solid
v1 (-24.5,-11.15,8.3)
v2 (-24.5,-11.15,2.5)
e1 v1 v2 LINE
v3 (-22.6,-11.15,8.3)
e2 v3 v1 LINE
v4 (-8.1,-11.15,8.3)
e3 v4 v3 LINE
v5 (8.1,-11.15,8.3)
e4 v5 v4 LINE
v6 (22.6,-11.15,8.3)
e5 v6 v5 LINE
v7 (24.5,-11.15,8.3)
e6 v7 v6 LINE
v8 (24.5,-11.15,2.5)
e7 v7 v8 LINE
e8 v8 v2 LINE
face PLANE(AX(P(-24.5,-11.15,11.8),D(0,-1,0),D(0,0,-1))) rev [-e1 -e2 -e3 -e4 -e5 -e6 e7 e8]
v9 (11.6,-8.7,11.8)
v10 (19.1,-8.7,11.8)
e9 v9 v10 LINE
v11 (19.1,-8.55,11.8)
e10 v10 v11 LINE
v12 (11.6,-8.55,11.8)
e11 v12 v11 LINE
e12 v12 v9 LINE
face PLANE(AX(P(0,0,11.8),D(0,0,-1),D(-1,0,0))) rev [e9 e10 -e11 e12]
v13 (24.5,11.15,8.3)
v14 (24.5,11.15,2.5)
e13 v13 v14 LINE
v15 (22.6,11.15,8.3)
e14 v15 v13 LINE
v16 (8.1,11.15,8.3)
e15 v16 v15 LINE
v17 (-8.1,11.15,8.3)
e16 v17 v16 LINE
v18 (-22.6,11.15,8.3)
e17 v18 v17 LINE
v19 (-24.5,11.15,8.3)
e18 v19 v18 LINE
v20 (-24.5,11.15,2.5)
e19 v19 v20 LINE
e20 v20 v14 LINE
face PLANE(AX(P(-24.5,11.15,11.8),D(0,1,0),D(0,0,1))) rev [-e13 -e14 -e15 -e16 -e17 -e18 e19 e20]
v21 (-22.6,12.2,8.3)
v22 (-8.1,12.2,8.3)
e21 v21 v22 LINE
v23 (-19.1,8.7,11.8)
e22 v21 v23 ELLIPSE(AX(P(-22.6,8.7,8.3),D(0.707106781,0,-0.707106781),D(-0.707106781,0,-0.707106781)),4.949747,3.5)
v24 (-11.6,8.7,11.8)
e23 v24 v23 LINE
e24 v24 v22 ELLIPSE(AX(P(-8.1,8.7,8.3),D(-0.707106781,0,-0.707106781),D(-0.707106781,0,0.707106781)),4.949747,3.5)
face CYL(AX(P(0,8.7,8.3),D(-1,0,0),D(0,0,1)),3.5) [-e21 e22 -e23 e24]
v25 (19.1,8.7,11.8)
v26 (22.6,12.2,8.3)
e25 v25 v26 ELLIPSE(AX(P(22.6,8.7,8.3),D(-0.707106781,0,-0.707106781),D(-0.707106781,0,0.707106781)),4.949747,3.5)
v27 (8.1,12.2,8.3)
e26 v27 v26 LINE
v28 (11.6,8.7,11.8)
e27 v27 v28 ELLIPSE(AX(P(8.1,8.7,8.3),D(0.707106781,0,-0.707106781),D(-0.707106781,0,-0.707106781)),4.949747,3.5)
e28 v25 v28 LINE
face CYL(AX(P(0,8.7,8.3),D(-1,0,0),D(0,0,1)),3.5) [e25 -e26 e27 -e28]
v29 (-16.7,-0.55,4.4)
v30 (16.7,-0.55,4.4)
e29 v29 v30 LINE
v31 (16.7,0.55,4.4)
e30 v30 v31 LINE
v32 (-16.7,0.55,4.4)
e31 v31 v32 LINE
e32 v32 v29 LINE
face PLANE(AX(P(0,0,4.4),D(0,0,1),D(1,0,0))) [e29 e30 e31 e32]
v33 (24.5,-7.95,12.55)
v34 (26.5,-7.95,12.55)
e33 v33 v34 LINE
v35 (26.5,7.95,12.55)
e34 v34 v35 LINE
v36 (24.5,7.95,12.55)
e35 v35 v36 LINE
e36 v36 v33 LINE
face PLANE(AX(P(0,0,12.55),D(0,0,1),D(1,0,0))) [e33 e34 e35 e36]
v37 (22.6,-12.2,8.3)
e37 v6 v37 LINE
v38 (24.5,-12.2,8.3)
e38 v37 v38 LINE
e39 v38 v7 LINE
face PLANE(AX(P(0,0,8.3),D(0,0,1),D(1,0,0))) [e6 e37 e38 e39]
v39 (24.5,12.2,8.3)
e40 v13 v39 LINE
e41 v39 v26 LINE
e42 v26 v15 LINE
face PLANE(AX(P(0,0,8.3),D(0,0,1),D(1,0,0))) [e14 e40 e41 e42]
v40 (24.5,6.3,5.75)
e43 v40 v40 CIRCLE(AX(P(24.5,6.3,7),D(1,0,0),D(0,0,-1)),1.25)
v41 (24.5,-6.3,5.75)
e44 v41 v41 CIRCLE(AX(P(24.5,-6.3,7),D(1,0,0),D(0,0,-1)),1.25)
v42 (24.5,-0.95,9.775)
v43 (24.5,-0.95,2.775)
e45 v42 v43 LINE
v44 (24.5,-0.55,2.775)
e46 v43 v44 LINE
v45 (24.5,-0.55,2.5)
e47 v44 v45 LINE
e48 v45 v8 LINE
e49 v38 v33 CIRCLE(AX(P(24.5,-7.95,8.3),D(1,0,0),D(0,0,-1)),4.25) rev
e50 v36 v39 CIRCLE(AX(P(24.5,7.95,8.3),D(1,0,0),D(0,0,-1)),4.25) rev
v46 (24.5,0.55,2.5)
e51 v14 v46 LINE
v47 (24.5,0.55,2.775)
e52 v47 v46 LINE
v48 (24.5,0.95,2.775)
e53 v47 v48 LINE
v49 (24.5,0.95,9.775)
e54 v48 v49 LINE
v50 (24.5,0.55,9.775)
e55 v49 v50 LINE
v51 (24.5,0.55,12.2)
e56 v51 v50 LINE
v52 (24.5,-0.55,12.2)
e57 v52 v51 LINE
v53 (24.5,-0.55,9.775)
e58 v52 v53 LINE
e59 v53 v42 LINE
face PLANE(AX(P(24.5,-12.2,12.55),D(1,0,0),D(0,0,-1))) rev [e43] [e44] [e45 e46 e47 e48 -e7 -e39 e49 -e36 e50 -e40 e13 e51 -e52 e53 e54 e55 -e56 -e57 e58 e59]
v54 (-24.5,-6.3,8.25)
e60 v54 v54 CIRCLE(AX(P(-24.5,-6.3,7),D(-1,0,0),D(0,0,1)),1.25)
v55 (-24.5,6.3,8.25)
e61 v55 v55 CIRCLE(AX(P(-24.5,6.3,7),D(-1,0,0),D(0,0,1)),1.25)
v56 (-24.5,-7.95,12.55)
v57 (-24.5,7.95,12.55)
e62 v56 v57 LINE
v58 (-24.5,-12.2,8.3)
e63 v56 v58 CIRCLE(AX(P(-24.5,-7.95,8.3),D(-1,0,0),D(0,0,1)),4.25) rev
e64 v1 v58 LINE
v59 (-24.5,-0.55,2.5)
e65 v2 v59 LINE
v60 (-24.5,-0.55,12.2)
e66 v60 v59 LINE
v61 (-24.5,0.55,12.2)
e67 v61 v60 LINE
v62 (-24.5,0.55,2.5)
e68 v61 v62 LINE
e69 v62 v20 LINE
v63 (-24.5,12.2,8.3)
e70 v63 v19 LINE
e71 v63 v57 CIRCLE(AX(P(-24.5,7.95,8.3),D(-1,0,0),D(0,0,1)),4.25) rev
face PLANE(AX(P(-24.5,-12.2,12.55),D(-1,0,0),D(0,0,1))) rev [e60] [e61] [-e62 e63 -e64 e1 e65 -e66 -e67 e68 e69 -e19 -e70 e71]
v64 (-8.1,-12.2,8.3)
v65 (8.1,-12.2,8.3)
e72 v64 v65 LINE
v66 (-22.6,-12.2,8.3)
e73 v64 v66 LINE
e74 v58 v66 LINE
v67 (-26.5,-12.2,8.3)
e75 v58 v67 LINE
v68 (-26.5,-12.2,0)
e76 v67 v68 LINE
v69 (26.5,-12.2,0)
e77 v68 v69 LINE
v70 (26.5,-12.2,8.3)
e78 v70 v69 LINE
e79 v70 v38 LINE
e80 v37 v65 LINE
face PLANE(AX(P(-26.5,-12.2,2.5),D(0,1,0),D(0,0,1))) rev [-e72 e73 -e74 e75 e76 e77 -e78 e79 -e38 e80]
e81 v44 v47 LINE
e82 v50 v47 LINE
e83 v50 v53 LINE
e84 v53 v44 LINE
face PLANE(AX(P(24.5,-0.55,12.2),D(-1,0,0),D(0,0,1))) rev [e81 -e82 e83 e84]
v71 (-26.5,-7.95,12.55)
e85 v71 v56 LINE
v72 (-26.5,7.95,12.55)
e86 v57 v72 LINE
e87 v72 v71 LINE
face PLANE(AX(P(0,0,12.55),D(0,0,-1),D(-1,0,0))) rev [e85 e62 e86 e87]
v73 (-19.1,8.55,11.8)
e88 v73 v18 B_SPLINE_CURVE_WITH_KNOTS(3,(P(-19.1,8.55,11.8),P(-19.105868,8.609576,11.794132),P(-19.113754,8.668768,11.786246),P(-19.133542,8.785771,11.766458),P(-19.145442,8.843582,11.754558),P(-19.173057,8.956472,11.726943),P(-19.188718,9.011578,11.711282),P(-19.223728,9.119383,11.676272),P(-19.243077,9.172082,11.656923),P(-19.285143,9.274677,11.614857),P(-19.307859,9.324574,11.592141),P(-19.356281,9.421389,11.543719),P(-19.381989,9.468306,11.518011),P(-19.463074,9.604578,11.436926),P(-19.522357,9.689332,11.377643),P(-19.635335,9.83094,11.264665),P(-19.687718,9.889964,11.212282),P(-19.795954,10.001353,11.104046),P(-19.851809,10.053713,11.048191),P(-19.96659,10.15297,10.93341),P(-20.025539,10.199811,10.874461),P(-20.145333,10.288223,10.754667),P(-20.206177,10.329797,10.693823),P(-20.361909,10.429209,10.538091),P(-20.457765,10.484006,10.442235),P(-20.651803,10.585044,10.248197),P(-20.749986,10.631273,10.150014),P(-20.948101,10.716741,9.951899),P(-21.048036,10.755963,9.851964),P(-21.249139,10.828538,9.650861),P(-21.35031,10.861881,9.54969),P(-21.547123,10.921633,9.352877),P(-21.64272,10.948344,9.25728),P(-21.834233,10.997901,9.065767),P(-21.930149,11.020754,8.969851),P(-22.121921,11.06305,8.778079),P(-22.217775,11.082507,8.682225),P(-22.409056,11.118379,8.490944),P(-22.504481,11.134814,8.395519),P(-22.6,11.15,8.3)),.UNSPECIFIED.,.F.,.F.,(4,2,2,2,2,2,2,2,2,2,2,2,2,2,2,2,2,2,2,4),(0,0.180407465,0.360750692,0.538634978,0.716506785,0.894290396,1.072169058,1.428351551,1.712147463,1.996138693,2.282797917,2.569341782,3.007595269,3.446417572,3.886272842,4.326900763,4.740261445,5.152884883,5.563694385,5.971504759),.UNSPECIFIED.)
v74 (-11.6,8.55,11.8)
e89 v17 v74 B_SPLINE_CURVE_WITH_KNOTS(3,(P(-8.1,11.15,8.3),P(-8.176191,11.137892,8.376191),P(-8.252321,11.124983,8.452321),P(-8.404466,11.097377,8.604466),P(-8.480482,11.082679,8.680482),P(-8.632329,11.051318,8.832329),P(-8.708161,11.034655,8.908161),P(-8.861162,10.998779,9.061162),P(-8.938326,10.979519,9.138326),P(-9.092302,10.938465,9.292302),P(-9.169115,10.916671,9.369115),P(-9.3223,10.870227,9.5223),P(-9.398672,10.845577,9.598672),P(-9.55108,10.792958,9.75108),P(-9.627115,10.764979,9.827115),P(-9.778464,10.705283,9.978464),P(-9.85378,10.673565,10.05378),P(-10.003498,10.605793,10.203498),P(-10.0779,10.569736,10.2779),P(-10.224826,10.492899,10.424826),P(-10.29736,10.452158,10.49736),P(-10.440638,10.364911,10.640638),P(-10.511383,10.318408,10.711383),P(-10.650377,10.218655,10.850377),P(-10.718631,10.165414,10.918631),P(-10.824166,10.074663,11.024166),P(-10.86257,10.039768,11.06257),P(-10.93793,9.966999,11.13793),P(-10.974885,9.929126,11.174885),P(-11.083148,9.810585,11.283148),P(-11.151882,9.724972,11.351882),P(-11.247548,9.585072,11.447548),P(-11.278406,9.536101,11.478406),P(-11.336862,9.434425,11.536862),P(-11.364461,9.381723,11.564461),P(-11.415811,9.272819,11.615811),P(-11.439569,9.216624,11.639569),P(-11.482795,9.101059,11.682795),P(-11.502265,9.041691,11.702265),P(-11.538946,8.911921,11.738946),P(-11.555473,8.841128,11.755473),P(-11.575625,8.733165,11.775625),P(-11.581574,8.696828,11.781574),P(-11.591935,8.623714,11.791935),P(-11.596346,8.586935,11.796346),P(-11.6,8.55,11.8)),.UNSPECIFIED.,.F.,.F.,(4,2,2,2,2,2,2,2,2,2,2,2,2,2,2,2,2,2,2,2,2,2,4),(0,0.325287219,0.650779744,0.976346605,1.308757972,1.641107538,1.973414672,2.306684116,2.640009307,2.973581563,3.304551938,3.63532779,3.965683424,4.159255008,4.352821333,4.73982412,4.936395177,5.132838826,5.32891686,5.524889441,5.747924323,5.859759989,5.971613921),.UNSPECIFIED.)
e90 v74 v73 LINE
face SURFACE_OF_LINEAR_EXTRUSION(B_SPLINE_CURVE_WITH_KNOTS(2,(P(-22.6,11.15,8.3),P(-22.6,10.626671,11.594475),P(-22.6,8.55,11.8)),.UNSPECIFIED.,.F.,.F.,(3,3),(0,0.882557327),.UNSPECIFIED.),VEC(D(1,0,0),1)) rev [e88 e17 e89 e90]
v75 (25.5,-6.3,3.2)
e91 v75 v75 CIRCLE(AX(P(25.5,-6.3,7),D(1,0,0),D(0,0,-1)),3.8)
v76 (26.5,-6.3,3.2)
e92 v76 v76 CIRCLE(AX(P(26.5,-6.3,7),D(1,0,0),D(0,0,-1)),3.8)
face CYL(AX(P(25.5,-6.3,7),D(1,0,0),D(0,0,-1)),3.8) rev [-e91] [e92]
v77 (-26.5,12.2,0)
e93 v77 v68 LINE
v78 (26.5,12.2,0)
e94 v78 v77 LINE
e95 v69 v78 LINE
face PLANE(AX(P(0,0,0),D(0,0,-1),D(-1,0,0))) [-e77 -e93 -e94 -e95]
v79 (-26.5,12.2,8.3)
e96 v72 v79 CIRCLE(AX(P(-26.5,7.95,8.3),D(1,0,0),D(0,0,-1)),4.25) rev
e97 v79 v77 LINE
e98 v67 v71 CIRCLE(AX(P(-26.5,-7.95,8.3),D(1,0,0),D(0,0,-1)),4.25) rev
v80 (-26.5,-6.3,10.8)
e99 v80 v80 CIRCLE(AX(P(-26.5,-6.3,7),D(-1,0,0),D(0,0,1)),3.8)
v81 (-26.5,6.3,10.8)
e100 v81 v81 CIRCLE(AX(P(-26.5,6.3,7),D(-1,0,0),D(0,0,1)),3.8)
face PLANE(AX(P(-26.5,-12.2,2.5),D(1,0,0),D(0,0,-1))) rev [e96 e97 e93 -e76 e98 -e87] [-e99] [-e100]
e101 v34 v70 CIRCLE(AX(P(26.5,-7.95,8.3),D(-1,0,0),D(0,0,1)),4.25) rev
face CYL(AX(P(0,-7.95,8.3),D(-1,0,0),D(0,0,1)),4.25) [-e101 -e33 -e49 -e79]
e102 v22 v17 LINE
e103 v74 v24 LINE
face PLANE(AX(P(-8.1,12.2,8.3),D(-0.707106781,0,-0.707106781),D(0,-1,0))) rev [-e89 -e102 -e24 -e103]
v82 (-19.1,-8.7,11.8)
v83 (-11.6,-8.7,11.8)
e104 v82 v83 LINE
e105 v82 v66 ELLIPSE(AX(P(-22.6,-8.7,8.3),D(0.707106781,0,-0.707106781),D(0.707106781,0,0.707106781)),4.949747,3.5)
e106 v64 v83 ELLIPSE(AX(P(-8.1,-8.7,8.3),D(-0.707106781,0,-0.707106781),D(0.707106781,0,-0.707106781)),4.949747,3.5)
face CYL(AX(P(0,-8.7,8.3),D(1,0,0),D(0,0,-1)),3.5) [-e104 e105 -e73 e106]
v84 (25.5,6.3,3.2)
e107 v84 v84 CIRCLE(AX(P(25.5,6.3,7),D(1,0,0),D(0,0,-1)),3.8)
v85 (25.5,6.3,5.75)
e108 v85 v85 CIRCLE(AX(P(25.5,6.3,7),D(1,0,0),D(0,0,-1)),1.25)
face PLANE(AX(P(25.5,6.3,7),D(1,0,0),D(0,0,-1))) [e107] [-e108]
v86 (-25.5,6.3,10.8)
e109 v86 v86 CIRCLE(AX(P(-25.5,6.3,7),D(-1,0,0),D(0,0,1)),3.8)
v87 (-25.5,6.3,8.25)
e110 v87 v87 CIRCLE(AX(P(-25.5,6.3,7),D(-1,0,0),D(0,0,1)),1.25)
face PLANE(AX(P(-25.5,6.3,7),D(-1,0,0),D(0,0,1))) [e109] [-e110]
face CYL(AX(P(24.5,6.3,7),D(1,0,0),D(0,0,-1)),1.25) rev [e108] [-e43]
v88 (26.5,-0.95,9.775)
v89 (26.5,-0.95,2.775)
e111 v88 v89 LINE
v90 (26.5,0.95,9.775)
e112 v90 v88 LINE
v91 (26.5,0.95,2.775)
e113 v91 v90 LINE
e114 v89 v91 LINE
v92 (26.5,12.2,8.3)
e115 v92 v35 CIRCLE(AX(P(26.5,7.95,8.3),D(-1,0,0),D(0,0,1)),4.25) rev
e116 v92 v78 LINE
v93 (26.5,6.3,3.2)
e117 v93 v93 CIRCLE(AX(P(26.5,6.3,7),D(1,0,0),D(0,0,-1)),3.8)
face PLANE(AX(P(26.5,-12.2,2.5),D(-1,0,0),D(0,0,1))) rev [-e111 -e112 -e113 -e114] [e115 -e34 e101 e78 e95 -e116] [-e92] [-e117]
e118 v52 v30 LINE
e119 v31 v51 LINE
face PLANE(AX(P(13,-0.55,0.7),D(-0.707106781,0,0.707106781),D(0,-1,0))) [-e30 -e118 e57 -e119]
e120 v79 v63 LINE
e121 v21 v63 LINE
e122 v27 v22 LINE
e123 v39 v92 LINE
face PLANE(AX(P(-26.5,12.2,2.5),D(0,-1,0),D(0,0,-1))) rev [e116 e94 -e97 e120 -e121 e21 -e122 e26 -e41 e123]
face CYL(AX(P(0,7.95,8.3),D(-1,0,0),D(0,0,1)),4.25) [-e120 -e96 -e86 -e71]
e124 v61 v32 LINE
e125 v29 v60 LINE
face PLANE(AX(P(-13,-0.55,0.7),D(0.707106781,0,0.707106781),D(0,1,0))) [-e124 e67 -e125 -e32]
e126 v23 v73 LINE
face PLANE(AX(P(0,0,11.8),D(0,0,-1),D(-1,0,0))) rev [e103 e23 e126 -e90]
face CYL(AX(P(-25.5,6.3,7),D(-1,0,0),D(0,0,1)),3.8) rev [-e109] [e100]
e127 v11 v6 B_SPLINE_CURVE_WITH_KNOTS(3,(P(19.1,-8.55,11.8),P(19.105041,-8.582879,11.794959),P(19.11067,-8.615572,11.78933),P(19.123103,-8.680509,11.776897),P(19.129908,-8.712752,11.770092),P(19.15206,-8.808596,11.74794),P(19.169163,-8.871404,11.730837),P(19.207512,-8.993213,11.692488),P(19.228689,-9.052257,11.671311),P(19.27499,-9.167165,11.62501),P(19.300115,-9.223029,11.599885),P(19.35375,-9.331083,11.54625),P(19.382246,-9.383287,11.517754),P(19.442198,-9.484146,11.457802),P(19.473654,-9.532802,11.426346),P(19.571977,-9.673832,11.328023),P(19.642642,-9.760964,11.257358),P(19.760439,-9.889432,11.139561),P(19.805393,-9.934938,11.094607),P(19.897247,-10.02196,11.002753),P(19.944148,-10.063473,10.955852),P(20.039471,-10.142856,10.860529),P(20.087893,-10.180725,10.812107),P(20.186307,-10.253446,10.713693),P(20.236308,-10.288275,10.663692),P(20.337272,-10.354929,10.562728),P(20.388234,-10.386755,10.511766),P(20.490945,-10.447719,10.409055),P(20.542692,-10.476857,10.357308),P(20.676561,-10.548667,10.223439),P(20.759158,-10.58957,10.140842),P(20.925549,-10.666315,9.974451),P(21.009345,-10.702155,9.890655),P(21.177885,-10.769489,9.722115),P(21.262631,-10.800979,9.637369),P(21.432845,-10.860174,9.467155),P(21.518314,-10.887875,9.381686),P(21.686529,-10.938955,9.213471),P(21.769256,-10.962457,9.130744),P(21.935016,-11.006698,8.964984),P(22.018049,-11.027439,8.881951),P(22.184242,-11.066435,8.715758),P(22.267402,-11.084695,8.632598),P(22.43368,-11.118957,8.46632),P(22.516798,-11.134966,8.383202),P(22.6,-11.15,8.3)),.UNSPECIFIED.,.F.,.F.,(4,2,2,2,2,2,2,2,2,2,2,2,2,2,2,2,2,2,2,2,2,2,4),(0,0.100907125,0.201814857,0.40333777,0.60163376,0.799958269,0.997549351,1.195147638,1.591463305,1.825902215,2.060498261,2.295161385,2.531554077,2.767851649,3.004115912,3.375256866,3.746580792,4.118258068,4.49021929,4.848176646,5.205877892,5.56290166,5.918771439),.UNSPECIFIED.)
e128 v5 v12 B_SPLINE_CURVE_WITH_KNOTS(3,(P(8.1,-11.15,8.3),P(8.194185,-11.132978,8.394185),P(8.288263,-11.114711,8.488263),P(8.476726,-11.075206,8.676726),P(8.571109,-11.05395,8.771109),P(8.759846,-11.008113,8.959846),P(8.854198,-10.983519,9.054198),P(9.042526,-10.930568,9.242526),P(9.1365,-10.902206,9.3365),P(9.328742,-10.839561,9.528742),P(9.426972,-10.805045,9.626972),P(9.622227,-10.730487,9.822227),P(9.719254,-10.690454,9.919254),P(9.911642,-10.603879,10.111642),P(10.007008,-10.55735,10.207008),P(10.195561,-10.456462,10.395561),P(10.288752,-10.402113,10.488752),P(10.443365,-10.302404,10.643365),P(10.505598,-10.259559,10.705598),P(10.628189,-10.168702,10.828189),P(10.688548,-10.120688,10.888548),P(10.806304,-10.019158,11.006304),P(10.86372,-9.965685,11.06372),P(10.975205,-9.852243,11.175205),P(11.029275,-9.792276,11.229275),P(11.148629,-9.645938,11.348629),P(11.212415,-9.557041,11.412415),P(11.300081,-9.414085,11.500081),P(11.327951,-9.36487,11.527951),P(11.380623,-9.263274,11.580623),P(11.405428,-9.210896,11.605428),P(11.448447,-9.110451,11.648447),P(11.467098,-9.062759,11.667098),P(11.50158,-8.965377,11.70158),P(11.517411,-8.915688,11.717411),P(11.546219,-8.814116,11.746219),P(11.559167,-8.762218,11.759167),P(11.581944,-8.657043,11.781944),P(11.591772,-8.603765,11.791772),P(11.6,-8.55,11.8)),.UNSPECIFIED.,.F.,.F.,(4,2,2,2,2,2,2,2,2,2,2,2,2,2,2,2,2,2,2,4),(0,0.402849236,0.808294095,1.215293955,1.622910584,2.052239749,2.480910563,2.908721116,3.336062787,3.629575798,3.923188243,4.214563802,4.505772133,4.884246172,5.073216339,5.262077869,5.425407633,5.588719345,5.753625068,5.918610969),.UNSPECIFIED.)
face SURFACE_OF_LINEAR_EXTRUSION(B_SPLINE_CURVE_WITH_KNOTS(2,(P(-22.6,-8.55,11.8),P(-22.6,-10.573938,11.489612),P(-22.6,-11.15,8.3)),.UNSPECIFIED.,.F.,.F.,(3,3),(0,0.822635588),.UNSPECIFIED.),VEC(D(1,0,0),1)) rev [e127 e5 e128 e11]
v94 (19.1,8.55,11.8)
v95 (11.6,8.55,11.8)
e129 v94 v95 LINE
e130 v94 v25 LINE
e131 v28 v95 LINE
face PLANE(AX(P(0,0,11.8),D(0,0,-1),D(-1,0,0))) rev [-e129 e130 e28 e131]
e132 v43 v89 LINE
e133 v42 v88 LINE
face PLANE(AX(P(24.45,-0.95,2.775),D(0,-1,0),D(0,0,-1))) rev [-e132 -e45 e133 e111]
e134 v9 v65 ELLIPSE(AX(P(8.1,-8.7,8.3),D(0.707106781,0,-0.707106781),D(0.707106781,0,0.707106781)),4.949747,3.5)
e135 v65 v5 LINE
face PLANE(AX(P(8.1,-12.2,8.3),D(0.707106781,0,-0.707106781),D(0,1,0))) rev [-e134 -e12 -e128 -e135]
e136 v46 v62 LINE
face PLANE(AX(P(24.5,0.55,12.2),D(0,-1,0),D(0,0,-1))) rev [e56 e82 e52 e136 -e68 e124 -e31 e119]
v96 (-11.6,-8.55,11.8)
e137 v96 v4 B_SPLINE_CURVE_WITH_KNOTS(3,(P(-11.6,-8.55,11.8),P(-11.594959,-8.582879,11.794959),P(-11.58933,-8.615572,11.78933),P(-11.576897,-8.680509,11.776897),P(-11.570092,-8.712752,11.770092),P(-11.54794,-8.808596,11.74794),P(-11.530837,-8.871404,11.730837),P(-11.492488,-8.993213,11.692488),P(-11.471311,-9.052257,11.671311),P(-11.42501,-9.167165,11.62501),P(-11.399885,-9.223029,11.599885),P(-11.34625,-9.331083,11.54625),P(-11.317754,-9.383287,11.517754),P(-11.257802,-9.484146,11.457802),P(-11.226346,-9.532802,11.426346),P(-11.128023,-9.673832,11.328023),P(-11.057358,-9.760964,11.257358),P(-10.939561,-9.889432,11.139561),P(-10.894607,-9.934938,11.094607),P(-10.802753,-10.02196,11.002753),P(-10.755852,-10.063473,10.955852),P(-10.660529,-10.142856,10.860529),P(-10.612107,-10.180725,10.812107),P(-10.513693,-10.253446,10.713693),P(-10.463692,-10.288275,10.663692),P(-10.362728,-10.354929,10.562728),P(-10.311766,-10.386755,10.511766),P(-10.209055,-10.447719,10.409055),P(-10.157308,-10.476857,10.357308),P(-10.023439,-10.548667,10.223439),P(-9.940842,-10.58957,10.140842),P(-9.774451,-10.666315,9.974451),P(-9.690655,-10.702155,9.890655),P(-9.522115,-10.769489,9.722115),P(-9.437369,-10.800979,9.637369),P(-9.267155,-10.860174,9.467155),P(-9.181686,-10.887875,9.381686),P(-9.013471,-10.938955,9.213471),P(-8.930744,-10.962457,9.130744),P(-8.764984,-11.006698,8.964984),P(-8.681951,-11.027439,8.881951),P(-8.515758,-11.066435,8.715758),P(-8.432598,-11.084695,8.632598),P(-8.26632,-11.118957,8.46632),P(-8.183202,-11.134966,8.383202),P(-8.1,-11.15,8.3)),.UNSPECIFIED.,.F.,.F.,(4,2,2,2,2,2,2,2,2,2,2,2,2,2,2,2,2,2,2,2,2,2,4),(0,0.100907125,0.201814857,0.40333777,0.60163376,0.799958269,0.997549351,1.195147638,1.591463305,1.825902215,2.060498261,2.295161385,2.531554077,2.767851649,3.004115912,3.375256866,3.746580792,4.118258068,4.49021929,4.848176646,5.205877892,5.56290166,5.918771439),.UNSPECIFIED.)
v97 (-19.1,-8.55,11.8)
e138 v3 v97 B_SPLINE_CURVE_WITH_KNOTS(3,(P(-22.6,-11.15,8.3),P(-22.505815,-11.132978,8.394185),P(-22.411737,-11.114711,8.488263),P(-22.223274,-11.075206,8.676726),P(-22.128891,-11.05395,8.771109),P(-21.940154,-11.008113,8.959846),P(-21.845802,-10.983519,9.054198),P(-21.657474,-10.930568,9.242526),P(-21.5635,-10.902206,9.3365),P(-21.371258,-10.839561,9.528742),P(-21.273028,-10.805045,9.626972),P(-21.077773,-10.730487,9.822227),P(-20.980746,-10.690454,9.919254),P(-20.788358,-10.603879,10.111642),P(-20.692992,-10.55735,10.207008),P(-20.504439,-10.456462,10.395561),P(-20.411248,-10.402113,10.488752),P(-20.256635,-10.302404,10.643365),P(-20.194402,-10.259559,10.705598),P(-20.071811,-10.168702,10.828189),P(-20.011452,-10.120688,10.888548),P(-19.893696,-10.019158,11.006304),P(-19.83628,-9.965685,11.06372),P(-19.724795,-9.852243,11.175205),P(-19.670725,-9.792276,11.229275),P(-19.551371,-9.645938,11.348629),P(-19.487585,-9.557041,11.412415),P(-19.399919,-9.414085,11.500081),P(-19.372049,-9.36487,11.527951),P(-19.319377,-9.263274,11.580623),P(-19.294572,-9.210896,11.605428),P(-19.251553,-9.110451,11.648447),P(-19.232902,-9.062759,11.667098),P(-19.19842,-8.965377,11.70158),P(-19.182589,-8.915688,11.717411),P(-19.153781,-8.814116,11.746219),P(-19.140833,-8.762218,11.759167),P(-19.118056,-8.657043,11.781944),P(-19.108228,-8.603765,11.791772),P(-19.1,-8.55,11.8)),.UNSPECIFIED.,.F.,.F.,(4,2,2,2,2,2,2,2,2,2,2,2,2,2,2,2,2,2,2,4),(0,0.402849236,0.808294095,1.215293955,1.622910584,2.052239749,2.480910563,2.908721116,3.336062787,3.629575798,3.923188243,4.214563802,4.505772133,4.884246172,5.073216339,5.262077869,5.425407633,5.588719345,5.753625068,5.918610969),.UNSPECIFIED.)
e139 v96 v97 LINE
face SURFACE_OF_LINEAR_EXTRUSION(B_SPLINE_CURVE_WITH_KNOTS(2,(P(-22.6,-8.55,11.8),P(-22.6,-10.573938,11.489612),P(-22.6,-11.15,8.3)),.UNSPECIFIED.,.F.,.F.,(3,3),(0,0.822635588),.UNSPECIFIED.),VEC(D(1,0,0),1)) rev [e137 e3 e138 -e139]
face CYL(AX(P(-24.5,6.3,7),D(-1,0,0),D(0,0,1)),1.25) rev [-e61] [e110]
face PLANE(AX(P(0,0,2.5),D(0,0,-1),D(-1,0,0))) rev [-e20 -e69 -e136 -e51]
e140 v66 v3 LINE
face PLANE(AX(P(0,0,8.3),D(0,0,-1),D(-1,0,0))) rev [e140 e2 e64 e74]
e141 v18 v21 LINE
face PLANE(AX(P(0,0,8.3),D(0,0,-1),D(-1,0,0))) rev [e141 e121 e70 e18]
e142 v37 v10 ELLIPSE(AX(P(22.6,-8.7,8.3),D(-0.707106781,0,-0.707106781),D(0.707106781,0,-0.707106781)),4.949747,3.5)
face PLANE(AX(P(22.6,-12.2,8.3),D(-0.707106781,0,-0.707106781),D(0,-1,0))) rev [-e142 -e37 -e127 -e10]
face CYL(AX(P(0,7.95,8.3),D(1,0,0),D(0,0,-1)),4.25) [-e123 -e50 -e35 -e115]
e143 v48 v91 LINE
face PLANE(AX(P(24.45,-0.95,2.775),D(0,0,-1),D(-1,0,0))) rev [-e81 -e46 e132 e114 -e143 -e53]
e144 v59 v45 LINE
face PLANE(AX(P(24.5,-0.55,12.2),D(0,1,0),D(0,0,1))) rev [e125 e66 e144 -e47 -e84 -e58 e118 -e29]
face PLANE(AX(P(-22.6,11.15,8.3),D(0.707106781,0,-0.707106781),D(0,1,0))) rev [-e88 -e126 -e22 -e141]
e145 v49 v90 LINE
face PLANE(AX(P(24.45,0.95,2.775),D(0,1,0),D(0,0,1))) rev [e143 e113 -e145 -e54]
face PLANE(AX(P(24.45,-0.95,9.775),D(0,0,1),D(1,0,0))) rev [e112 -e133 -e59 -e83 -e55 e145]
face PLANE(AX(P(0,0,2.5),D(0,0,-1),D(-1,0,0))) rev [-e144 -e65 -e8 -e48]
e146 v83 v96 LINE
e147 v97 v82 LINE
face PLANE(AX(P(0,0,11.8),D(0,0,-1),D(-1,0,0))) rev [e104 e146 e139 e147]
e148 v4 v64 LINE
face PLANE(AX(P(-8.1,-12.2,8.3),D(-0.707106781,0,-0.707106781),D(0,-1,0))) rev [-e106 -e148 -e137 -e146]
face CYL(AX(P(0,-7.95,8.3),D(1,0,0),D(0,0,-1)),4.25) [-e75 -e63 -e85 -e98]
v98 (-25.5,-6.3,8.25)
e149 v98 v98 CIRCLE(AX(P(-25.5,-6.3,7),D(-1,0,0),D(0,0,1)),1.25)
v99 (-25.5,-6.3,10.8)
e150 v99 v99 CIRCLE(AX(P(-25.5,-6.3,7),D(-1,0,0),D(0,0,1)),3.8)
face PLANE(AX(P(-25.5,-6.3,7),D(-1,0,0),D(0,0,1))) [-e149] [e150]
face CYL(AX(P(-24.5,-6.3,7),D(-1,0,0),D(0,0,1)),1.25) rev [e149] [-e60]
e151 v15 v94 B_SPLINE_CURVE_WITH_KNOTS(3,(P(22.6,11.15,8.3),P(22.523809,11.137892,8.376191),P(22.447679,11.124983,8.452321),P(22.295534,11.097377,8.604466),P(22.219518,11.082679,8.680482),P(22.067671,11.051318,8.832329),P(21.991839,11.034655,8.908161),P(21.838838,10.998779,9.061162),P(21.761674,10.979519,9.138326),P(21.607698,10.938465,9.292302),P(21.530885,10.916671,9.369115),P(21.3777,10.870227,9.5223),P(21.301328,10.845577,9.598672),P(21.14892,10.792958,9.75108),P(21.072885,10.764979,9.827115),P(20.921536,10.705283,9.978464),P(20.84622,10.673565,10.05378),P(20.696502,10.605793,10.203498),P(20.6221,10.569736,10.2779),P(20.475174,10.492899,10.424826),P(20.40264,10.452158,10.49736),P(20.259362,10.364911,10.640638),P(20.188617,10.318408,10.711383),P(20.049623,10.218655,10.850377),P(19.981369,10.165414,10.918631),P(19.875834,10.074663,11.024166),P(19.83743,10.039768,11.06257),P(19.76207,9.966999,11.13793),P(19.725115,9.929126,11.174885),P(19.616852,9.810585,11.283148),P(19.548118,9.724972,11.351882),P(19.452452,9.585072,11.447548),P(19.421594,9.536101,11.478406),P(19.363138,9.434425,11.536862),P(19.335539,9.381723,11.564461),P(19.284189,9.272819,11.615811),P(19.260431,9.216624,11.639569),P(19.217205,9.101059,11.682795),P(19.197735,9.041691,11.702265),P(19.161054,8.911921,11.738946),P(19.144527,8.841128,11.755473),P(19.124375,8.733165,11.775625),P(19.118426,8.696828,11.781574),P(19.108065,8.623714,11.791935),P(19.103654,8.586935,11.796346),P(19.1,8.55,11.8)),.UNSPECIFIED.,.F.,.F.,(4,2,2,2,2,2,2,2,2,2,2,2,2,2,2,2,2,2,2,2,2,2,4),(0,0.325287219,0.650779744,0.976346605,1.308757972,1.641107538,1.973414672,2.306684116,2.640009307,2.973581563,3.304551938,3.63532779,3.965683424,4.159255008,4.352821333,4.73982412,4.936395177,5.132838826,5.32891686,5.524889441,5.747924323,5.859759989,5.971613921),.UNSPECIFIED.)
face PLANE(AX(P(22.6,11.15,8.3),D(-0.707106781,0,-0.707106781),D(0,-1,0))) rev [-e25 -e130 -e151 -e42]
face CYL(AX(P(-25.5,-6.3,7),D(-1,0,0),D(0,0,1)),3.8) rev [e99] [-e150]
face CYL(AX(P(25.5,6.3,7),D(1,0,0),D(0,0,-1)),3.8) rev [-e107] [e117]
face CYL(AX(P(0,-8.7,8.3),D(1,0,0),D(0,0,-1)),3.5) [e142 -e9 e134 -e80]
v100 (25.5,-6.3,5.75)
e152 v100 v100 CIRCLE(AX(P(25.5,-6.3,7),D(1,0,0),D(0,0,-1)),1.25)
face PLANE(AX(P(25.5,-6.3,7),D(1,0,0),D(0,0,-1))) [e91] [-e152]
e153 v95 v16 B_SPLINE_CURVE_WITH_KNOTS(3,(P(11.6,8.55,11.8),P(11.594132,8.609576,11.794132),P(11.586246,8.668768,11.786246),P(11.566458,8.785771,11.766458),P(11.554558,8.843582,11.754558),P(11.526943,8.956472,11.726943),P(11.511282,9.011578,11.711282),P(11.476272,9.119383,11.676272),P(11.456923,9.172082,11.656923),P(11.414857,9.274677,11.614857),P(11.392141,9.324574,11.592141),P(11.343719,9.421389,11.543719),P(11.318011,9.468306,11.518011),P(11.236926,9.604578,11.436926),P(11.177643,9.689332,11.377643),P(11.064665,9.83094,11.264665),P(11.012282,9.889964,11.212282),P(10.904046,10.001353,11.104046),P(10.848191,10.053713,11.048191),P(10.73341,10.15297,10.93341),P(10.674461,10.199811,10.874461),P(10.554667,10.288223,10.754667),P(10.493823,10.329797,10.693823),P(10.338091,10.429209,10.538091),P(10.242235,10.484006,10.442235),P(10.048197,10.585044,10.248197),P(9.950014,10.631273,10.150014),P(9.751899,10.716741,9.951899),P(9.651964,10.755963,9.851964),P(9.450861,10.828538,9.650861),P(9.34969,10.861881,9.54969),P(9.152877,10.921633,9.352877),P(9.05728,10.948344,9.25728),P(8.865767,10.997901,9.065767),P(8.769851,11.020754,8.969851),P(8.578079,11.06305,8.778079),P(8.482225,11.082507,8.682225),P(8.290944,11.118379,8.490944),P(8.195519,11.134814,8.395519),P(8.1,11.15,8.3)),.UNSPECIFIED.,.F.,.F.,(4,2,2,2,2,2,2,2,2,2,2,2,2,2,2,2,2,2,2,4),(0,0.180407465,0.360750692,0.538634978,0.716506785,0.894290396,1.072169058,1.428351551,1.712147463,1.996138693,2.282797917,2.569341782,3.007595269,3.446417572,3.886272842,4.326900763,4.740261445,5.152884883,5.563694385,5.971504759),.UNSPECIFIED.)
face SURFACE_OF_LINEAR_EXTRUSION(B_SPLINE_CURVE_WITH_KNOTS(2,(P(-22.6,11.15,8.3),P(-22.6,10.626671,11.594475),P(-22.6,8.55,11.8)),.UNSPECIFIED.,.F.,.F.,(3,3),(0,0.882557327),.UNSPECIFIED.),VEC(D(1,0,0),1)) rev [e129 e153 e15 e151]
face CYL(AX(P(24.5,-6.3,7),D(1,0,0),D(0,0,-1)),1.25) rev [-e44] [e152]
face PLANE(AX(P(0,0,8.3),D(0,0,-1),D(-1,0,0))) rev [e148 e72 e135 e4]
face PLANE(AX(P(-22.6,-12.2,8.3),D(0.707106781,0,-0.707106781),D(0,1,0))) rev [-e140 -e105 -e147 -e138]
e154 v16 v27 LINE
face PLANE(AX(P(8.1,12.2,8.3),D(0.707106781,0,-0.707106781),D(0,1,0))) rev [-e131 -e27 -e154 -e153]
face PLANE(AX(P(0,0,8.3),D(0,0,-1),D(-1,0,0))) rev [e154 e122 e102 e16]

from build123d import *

# Parameters (mm, degrees)
SKICA1_W                 = 53
SKICA1_H                 = 24.4
P_IDAT_VYSUNUT_M1_DEPTH  = 2.5
SKICA2_W                 = 49
SKICA2_H                 = 1.05
P_IDAT_VYSUNUT_M2_DEPTH  = 9.3
SKICA3_W                 = 16.2
SKICA3_H                 = 1.05
SKICA3_W_2               = 1.9
ODEBRAT_VYSUNUT_M1_DEPTH = 3.5
SKICA7_W                 = 14.5
SKICA7_H                 = 3.5
P_IDAT_VYSUNUT_M3_DEPTH  = 2.6
SKICA6_W                 = 14.5
SKICA6_H                 = 3.5
P_IDAT_VYSUNUT_M4_DEPTH  = 2.6
SKICA8_W                 = 14.5
SKICA8_H                 = 3.5
P_IDAT_VYSUNUT_M5_DEPTH  = 2.6
ZAOBLIT3_R               = 3.5
ODEBRAT_START            = -45.2
ODEBRAT_VYSUNUT_M2_DEPTH = 45.2
ODEBRAT_VYSUNUT_M3_DEPTH = 45.2
ZKOSEN_3_SIZE            = 3.5
SKICA14_W                = 2
SKICA14_H                = 24.4
P_IDAT_VYSUNUT_M6_DEPTH  = 10.05
ZAOBLIT4_R               = 4.25
SKICA17_W                = 7
SKICA17_H                = 1.9
ODEBRAT_VYSUNUT_M4_DEPTH = 2.05
SKICA18_R                = 3.8
ODEBRAT_VYSUNUT_M5_DEPTH = 1
SKICA20_R                = 1.25
ODEBRAT_VYSUNUT_M6_DEPTH = 1
ODEBRAT_START_2          = -1
SKICA21_R                = 3.8
ODEBRAT_VYSUNUT_M7_DEPTH = 1
SKICA22_R                = 1.25
ODEBRAT_VYSUNUT_M8_DEPTH = 1
SKICA23_W                = 49
SKICA23_H                = 1.1
P_IDAT_VYSUNUT_M7_DEPTH  = 9.7
SKICA24_W                = 26
SKICA24_H                = 1.1
ODEBRAT_VYSUNUT_M9_DEPTH = 7.8


with BuildPart() as part:
    # Skica1 → Přidat vysunutím1 (new body)
    with BuildSketch(Plane.XY):
        Rectangle(SKICA1_W, SKICA1_H)
    extrude(amount=P_IDAT_VYSUNUT_M1_DEPTH)

    # Skica2 → Přidat vysunutím2 (add)
    with BuildSketch(Plane.XY.offset(2.5)):
        with Locations((0, 11.675)):
            Rectangle(SKICA2_W, SKICA2_H)
        with Locations((0, -11.675)):
            Rectangle(SKICA2_W, SKICA2_H)
    extrude(amount=P_IDAT_VYSUNUT_M2_DEPTH)

    # Skica3 → Odebrat vysunutím1 (cut)
    with BuildSketch(Plane.XY.offset(11.8)):
        with Locations((0, -11.675)):
            Rectangle(SKICA3_W, SKICA3_H)
        with Locations((0, 11.675)):
            Rectangle(SKICA3_W, SKICA3_H)
        with Locations((-23.55, 11.675)):
            Rectangle(SKICA3_W_2, SKICA3_H)
        with Locations((-23.55, -11.675)):
            Rectangle(SKICA3_W_2, SKICA3_H)
        with Locations((23.55, 11.675)):
            Rectangle(SKICA3_W_2, SKICA3_H)
        with Locations((23.55, -11.675)):
            Rectangle(SKICA3_W_2, SKICA3_H)
    extrude(amount=-ODEBRAT_VYSUNUT_M1_DEPTH, mode=Mode.SUBTRACT)

    # Skica7 → Přidat vysunutím3 (add)
    with BuildSketch(Plane(origin=(0, 11.15, 0), x_dir=(-1, 0, 0), z_dir=(0, -1, 0))):
        with Locations((15.35, -10.05)):
            Rectangle(SKICA7_W, SKICA7_H)
        with Locations((-15.35, -10.05)):
            Rectangle(SKICA7_W, SKICA7_H)
    extrude(amount=P_IDAT_VYSUNUT_M3_DEPTH)

    # Skica6 → Přidat vysunutím4 (add)
    with BuildSketch(Plane(origin=(0, -11.15, 0), x_dir=(1, 0, 0), z_dir=(0, 1, 0))):
        with Locations((-15.35, -10.05)):
            Rectangle(SKICA6_W, SKICA6_H)
    extrude(amount=P_IDAT_VYSUNUT_M4_DEPTH)

    # Skica8 → Přidat vysunutím5 (add)
    with BuildSketch(Plane(origin=(0, -11.15, 0), x_dir=(1, 0, 0), z_dir=(0, 1, 0))):
        with Locations((15.35, -10.05)):
            Rectangle(SKICA8_W, SKICA8_H)
    extrude(amount=P_IDAT_VYSUNUT_M5_DEPTH)

    # Zaoblit3
    zaoblit3_edges = [part.edges().sort_by_distance(p)[0] for p in [
        (15.35, 12.2, 11.8),
        (-15.35, 12.2, 11.8),
        (-15.35, -12.2, 11.8),
        (15.35, -12.2, 11.8),
    ]]
    fillet(zaoblit3_edges, radius=ZAOBLIT3_R)

    # Skica11 → Odebrat vysunutím2 (cut)
    with BuildSketch(Plane(origin=(22.6, 0, 0), x_dir=(0, 0, -1), z_dir=(1, 0, 0)).offset(ODEBRAT_START)):
        with BuildLine():
            Line((-11.8, -8.55), (-8.3, -8.55))
            Line((-8.3, -8.55), (-8.3, -11.15))
            add(Edge.make_bspline(
                [(-8.3, -11.15), (-11.489612279, -10.573938185), (-11.8, -8.55)],
                knots=[0, 0, 0, 0.822635588, 0.822635588, 0.822635588], degree=2))
        make_face()
    extrude(amount=ODEBRAT_VYSUNUT_M2_DEPTH, mode=Mode.SUBTRACT)

    # Skica13 → Odebrat vysunutím3 (cut)
    with BuildSketch(Plane(origin=(22.6, 0, 0), x_dir=(0, 0, -1), z_dir=(1, 0, 0)).offset(ODEBRAT_START)):
        with BuildLine():
            Line((-11.8, 8.55), (-8.3, 8.55))
            Line((-8.3, 8.55), (-8.3, 11.15))
            add(Edge.make_bspline(
                [(-8.3, 11.15), (-11.594475323, 10.62667069), (-11.8, 8.55)],
                knots=[0, 0, 0, 0.882557327, 0.882557327, 0.882557327], degree=2))
        make_face()
    extrude(amount=ODEBRAT_VYSUNUT_M3_DEPTH, mode=Mode.SUBTRACT)

    # Zkosení3
    # the kernel refuses this chamfer: 3.5 mm, written as the material it takes off along each edge
    with BuildSketch(Plane(origin=(-22.6, 0.450890458, 11.8), x_dir=(-0.027495876610586112, 0, -0.9996219169112968), z_dir=(0, -1, 0)), Plane(origin=(-8.1, 0.450890458, 11.8), x_dir=(-0.9996219169112968, 0, 0.027495876610586605), z_dir=(0, -1, 0)), Plane(origin=(-22.6, -0.450890458, 11.8), x_dir=(0.9996219169112968, 3.891912830509087e-15, 0.02749587661058662), z_dir=(0, 1, 0)), Plane(origin=(-8.1, -0.450890458, 11.8), x_dir=(0.027495876610586605, 0, -0.9996219169112968), z_dir=(0, 1, 0)), Plane(origin=(8.1, -0.450890458, 11.8), x_dir=(0.9996219169112968, 0, 0.027495876610586605), z_dir=(0, 1, 0)), Plane(origin=(22.6, -0.450890458, 11.8), x_dir=(0.027495876610586112, 0, -0.9996219169112968), z_dir=(0, 1, 0)), Plane(origin=(8.1, 0.450890458, 11.8), x_dir=(-0.027495876610586605, 0, -0.9996219169112968), z_dir=(0, -1, 0)), Plane(origin=(22.6, 0.450890458, 11.8), x_dir=(-0.9996219169112968, 3.891912830509087e-15, 0.02749587661058662), z_dir=(0, -1, 0))) as zkosen_3_piece_1:
        Polygon((ZKOSEN_3_SIZE * 0.999621916911, ZKOSEN_3_SIZE * 0.0274958766106), (-ZKOSEN_3_SIZE * 0.0274958766106, ZKOSEN_3_SIZE * 0.999621916911), (0, 0), align=None)
    extrude(amount=18.151780916, mode=Mode.SUBTRACT)

    # Skica14 → Přidat vysunutím6 (add)
    with BuildSketch(Plane.XY.offset(2.5)):
        with Locations((25.5, 0)):
            Rectangle(SKICA14_W, SKICA14_H)
        with Locations((-25.5, 0)):
            Rectangle(SKICA14_W, SKICA14_H)
    extrude(amount=P_IDAT_VYSUNUT_M6_DEPTH)

    # Zaoblit4
    zaoblit4_edges = [part.edges().sort_by_distance(p)[0] for p in [
        (-25.5, 12.2, 12.55),
        (-25.5, -12.2, 12.55),
        (25.5, -12.2, 12.55),
        (25.5, 12.2, 12.55),
    ]]
    fillet(zaoblit4_edges, radius=ZAOBLIT4_R)

    # Skica17 → Odebrat vysunutím4 (cut)
    with BuildSketch(Plane(origin=(26.5, 0, 0), x_dir=(0, 0, -1), z_dir=(1, 0, 0))):
        with Locations((-6.275, 0)):
            Rectangle(SKICA17_W, SKICA17_H)
    extrude(amount=-ODEBRAT_VYSUNUT_M4_DEPTH, mode=Mode.SUBTRACT)

    # Skica18 → Odebrat vysunutím5 (cut)
    with BuildSketch(Plane(origin=(26.5, 0, 0), x_dir=(0, 0, -1), z_dir=(1, 0, 0))):
        with Locations((-7, 6.3)):
            Circle(SKICA18_R)
        with Locations((-7, -6.3)):
            Circle(SKICA18_R)
    extrude(amount=-ODEBRAT_VYSUNUT_M5_DEPTH, mode=Mode.SUBTRACT)

    # Skica20 → Odebrat vysunutím6 (cut)
    with BuildSketch(Plane(origin=(25.5, 0, 0), x_dir=(0, 0, -1), z_dir=(1, 0, 0))):
        with Locations((-7, -6.3)):
            Circle(SKICA20_R)
        with Locations((-7, 6.3)):
            Circle(SKICA20_R)
    extrude(amount=-ODEBRAT_VYSUNUT_M6_DEPTH, mode=Mode.SUBTRACT)

    # Skica21 → Odebrat vysunutím7 (cut)
    with BuildSketch(Plane.ZY.offset(26.5).offset(ODEBRAT_START_2)):
        with Locations(Location((7, 6.3, 0), (0, 0, 180))):
            Circle(SKICA21_R)
        with Locations(Location((7, -6.3, 0), (0, 0, 180))):
            Circle(SKICA21_R)
    extrude(amount=ODEBRAT_VYSUNUT_M7_DEPTH, mode=Mode.SUBTRACT)

    # Skica22 → Odebrat vysunutím8 (cut)
    with BuildSketch(Plane.ZY.offset(25.5).offset(ODEBRAT_START_2)):
        with Locations(Location((7, -6.3, 0), (0, 0, 180))):
            Circle(SKICA22_R)
        with Locations(Location((7, 6.3, 0), (0, 0, 180))):
            Circle(SKICA22_R)
    extrude(amount=ODEBRAT_VYSUNUT_M8_DEPTH, mode=Mode.SUBTRACT)

    # Skica23 → Přidat vysunutím7 (add)
    with BuildSketch(Plane.XY.offset(2.5)):
        Rectangle(SKICA23_W, SKICA23_H)
    extrude(amount=P_IDAT_VYSUNUT_M7_DEPTH)

    # Skica24 → Odebrat vysunutím9 (cut)
    with BuildSketch(Plane.XY.offset(12.2)):
        Rectangle(SKICA24_W, SKICA24_H)
    extrude(amount=-ODEBRAT_VYSUNUT_M9_DEPTH, mode=Mode.SUBTRACT)

    # Zkosení5
    # the kernel refuses this chamfer: 11.5 mm, written as the material it takes off along each edge
    with BuildSketch(Plane(origin=(-13, -0.55, 12.2), x_dir=(-0.9996219169112968, 0, 0.027495876610586382), z_dir=(0, 1, 0))) as zkosen_5_piece_1_section:
        with BuildLine():
            Line((11.829741745, 0), (-0.650292281, -11.811854626))
            Line((-0.650292281, -11.811854626), (-0.880205322, -11.805530574))
            ThreePointArc((-0.880205322, -11.805530574), (-0.392486111, -5.904075041), (-0.229913041, 0.006324052))
            Line((-0.229913041, 0.006324052), (0.006324052, 0.229913041))
            ThreePointArc((0.006324052, 0.229913041), (5.916723144, 0.067339971), (11.836065796, 0.229913041))
            Line((11.836065796, 0.229913041), (11.829741745, 0))
        make_face()
    zkosen_5_piece_1 = extrude(amount=1.1, mode=Mode.PRIVATE)
    zkosen_5_piece_1 = split(zkosen_5_piece_1, bisect_by=Plane(origin=(-24.5, 0, 9.11358538), z_dir=(1, 0, 0)), keep=Keep.TOP, mode=Mode.PRIVATE)
    zkosen_5_piece_1 = split(zkosen_5_piece_1, bisect_by=Plane(origin=(-17.151338027, 0, 4.4), z_dir=(0, 0, 1)), keep=Keep.TOP, mode=Mode.PRIVATE)
    add(zkosen_5_piece_1, mode=Mode.SUBTRACT)

    # Zkosení6
    # the kernel refuses this chamfer: 11.5 mm, written as the material it takes off along each edge
    with BuildSketch(Plane(origin=(13, 0.55, 12.2), x_dir=(-0.02749587661058638, 0, -0.9996219169112968), z_dir=(0, -1, 0))) as zkosen_6_piece_1_section:
        with BuildLine():
            Line((11.829741745, 0), (-0.650292281, 11.811854626))
            Line((-0.650292281, 11.811854626), (-0.880205322, 11.805530574))
            ThreePointArc((-0.880205322, 11.805530574), (-0.392486111, 5.904075041), (-0.229913041, -0.006324052))
            Line((-0.229913041, -0.006324052), (0.006324052, -0.229913041))
            ThreePointArc((0.006324052, -0.229913041), (5.916723144, -0.067339971), (11.836065796, -0.229913041))
            Line((11.836065796, -0.229913041), (11.829741745, 0))
        make_face()
    zkosen_6_piece_1 = extrude(amount=1.1, mode=Mode.PRIVATE)
    zkosen_6_piece_1 = split(zkosen_6_piece_1, bisect_by=Plane(origin=(24.5, 0, 9.11358538), z_dir=(-1, 0, 0)), keep=Keep.TOP, mode=Mode.PRIVATE)
    zkosen_6_piece_1 = split(zkosen_6_piece_1, bisect_by=Plane(origin=(17.151338027, 0, 4.4), z_dir=(0, 0, 1)), keep=Keep.TOP, mode=Mode.PRIVATE)
    add(zkosen_6_piece_1, mode=Mode.SUBTRACT)


solid = part.part
